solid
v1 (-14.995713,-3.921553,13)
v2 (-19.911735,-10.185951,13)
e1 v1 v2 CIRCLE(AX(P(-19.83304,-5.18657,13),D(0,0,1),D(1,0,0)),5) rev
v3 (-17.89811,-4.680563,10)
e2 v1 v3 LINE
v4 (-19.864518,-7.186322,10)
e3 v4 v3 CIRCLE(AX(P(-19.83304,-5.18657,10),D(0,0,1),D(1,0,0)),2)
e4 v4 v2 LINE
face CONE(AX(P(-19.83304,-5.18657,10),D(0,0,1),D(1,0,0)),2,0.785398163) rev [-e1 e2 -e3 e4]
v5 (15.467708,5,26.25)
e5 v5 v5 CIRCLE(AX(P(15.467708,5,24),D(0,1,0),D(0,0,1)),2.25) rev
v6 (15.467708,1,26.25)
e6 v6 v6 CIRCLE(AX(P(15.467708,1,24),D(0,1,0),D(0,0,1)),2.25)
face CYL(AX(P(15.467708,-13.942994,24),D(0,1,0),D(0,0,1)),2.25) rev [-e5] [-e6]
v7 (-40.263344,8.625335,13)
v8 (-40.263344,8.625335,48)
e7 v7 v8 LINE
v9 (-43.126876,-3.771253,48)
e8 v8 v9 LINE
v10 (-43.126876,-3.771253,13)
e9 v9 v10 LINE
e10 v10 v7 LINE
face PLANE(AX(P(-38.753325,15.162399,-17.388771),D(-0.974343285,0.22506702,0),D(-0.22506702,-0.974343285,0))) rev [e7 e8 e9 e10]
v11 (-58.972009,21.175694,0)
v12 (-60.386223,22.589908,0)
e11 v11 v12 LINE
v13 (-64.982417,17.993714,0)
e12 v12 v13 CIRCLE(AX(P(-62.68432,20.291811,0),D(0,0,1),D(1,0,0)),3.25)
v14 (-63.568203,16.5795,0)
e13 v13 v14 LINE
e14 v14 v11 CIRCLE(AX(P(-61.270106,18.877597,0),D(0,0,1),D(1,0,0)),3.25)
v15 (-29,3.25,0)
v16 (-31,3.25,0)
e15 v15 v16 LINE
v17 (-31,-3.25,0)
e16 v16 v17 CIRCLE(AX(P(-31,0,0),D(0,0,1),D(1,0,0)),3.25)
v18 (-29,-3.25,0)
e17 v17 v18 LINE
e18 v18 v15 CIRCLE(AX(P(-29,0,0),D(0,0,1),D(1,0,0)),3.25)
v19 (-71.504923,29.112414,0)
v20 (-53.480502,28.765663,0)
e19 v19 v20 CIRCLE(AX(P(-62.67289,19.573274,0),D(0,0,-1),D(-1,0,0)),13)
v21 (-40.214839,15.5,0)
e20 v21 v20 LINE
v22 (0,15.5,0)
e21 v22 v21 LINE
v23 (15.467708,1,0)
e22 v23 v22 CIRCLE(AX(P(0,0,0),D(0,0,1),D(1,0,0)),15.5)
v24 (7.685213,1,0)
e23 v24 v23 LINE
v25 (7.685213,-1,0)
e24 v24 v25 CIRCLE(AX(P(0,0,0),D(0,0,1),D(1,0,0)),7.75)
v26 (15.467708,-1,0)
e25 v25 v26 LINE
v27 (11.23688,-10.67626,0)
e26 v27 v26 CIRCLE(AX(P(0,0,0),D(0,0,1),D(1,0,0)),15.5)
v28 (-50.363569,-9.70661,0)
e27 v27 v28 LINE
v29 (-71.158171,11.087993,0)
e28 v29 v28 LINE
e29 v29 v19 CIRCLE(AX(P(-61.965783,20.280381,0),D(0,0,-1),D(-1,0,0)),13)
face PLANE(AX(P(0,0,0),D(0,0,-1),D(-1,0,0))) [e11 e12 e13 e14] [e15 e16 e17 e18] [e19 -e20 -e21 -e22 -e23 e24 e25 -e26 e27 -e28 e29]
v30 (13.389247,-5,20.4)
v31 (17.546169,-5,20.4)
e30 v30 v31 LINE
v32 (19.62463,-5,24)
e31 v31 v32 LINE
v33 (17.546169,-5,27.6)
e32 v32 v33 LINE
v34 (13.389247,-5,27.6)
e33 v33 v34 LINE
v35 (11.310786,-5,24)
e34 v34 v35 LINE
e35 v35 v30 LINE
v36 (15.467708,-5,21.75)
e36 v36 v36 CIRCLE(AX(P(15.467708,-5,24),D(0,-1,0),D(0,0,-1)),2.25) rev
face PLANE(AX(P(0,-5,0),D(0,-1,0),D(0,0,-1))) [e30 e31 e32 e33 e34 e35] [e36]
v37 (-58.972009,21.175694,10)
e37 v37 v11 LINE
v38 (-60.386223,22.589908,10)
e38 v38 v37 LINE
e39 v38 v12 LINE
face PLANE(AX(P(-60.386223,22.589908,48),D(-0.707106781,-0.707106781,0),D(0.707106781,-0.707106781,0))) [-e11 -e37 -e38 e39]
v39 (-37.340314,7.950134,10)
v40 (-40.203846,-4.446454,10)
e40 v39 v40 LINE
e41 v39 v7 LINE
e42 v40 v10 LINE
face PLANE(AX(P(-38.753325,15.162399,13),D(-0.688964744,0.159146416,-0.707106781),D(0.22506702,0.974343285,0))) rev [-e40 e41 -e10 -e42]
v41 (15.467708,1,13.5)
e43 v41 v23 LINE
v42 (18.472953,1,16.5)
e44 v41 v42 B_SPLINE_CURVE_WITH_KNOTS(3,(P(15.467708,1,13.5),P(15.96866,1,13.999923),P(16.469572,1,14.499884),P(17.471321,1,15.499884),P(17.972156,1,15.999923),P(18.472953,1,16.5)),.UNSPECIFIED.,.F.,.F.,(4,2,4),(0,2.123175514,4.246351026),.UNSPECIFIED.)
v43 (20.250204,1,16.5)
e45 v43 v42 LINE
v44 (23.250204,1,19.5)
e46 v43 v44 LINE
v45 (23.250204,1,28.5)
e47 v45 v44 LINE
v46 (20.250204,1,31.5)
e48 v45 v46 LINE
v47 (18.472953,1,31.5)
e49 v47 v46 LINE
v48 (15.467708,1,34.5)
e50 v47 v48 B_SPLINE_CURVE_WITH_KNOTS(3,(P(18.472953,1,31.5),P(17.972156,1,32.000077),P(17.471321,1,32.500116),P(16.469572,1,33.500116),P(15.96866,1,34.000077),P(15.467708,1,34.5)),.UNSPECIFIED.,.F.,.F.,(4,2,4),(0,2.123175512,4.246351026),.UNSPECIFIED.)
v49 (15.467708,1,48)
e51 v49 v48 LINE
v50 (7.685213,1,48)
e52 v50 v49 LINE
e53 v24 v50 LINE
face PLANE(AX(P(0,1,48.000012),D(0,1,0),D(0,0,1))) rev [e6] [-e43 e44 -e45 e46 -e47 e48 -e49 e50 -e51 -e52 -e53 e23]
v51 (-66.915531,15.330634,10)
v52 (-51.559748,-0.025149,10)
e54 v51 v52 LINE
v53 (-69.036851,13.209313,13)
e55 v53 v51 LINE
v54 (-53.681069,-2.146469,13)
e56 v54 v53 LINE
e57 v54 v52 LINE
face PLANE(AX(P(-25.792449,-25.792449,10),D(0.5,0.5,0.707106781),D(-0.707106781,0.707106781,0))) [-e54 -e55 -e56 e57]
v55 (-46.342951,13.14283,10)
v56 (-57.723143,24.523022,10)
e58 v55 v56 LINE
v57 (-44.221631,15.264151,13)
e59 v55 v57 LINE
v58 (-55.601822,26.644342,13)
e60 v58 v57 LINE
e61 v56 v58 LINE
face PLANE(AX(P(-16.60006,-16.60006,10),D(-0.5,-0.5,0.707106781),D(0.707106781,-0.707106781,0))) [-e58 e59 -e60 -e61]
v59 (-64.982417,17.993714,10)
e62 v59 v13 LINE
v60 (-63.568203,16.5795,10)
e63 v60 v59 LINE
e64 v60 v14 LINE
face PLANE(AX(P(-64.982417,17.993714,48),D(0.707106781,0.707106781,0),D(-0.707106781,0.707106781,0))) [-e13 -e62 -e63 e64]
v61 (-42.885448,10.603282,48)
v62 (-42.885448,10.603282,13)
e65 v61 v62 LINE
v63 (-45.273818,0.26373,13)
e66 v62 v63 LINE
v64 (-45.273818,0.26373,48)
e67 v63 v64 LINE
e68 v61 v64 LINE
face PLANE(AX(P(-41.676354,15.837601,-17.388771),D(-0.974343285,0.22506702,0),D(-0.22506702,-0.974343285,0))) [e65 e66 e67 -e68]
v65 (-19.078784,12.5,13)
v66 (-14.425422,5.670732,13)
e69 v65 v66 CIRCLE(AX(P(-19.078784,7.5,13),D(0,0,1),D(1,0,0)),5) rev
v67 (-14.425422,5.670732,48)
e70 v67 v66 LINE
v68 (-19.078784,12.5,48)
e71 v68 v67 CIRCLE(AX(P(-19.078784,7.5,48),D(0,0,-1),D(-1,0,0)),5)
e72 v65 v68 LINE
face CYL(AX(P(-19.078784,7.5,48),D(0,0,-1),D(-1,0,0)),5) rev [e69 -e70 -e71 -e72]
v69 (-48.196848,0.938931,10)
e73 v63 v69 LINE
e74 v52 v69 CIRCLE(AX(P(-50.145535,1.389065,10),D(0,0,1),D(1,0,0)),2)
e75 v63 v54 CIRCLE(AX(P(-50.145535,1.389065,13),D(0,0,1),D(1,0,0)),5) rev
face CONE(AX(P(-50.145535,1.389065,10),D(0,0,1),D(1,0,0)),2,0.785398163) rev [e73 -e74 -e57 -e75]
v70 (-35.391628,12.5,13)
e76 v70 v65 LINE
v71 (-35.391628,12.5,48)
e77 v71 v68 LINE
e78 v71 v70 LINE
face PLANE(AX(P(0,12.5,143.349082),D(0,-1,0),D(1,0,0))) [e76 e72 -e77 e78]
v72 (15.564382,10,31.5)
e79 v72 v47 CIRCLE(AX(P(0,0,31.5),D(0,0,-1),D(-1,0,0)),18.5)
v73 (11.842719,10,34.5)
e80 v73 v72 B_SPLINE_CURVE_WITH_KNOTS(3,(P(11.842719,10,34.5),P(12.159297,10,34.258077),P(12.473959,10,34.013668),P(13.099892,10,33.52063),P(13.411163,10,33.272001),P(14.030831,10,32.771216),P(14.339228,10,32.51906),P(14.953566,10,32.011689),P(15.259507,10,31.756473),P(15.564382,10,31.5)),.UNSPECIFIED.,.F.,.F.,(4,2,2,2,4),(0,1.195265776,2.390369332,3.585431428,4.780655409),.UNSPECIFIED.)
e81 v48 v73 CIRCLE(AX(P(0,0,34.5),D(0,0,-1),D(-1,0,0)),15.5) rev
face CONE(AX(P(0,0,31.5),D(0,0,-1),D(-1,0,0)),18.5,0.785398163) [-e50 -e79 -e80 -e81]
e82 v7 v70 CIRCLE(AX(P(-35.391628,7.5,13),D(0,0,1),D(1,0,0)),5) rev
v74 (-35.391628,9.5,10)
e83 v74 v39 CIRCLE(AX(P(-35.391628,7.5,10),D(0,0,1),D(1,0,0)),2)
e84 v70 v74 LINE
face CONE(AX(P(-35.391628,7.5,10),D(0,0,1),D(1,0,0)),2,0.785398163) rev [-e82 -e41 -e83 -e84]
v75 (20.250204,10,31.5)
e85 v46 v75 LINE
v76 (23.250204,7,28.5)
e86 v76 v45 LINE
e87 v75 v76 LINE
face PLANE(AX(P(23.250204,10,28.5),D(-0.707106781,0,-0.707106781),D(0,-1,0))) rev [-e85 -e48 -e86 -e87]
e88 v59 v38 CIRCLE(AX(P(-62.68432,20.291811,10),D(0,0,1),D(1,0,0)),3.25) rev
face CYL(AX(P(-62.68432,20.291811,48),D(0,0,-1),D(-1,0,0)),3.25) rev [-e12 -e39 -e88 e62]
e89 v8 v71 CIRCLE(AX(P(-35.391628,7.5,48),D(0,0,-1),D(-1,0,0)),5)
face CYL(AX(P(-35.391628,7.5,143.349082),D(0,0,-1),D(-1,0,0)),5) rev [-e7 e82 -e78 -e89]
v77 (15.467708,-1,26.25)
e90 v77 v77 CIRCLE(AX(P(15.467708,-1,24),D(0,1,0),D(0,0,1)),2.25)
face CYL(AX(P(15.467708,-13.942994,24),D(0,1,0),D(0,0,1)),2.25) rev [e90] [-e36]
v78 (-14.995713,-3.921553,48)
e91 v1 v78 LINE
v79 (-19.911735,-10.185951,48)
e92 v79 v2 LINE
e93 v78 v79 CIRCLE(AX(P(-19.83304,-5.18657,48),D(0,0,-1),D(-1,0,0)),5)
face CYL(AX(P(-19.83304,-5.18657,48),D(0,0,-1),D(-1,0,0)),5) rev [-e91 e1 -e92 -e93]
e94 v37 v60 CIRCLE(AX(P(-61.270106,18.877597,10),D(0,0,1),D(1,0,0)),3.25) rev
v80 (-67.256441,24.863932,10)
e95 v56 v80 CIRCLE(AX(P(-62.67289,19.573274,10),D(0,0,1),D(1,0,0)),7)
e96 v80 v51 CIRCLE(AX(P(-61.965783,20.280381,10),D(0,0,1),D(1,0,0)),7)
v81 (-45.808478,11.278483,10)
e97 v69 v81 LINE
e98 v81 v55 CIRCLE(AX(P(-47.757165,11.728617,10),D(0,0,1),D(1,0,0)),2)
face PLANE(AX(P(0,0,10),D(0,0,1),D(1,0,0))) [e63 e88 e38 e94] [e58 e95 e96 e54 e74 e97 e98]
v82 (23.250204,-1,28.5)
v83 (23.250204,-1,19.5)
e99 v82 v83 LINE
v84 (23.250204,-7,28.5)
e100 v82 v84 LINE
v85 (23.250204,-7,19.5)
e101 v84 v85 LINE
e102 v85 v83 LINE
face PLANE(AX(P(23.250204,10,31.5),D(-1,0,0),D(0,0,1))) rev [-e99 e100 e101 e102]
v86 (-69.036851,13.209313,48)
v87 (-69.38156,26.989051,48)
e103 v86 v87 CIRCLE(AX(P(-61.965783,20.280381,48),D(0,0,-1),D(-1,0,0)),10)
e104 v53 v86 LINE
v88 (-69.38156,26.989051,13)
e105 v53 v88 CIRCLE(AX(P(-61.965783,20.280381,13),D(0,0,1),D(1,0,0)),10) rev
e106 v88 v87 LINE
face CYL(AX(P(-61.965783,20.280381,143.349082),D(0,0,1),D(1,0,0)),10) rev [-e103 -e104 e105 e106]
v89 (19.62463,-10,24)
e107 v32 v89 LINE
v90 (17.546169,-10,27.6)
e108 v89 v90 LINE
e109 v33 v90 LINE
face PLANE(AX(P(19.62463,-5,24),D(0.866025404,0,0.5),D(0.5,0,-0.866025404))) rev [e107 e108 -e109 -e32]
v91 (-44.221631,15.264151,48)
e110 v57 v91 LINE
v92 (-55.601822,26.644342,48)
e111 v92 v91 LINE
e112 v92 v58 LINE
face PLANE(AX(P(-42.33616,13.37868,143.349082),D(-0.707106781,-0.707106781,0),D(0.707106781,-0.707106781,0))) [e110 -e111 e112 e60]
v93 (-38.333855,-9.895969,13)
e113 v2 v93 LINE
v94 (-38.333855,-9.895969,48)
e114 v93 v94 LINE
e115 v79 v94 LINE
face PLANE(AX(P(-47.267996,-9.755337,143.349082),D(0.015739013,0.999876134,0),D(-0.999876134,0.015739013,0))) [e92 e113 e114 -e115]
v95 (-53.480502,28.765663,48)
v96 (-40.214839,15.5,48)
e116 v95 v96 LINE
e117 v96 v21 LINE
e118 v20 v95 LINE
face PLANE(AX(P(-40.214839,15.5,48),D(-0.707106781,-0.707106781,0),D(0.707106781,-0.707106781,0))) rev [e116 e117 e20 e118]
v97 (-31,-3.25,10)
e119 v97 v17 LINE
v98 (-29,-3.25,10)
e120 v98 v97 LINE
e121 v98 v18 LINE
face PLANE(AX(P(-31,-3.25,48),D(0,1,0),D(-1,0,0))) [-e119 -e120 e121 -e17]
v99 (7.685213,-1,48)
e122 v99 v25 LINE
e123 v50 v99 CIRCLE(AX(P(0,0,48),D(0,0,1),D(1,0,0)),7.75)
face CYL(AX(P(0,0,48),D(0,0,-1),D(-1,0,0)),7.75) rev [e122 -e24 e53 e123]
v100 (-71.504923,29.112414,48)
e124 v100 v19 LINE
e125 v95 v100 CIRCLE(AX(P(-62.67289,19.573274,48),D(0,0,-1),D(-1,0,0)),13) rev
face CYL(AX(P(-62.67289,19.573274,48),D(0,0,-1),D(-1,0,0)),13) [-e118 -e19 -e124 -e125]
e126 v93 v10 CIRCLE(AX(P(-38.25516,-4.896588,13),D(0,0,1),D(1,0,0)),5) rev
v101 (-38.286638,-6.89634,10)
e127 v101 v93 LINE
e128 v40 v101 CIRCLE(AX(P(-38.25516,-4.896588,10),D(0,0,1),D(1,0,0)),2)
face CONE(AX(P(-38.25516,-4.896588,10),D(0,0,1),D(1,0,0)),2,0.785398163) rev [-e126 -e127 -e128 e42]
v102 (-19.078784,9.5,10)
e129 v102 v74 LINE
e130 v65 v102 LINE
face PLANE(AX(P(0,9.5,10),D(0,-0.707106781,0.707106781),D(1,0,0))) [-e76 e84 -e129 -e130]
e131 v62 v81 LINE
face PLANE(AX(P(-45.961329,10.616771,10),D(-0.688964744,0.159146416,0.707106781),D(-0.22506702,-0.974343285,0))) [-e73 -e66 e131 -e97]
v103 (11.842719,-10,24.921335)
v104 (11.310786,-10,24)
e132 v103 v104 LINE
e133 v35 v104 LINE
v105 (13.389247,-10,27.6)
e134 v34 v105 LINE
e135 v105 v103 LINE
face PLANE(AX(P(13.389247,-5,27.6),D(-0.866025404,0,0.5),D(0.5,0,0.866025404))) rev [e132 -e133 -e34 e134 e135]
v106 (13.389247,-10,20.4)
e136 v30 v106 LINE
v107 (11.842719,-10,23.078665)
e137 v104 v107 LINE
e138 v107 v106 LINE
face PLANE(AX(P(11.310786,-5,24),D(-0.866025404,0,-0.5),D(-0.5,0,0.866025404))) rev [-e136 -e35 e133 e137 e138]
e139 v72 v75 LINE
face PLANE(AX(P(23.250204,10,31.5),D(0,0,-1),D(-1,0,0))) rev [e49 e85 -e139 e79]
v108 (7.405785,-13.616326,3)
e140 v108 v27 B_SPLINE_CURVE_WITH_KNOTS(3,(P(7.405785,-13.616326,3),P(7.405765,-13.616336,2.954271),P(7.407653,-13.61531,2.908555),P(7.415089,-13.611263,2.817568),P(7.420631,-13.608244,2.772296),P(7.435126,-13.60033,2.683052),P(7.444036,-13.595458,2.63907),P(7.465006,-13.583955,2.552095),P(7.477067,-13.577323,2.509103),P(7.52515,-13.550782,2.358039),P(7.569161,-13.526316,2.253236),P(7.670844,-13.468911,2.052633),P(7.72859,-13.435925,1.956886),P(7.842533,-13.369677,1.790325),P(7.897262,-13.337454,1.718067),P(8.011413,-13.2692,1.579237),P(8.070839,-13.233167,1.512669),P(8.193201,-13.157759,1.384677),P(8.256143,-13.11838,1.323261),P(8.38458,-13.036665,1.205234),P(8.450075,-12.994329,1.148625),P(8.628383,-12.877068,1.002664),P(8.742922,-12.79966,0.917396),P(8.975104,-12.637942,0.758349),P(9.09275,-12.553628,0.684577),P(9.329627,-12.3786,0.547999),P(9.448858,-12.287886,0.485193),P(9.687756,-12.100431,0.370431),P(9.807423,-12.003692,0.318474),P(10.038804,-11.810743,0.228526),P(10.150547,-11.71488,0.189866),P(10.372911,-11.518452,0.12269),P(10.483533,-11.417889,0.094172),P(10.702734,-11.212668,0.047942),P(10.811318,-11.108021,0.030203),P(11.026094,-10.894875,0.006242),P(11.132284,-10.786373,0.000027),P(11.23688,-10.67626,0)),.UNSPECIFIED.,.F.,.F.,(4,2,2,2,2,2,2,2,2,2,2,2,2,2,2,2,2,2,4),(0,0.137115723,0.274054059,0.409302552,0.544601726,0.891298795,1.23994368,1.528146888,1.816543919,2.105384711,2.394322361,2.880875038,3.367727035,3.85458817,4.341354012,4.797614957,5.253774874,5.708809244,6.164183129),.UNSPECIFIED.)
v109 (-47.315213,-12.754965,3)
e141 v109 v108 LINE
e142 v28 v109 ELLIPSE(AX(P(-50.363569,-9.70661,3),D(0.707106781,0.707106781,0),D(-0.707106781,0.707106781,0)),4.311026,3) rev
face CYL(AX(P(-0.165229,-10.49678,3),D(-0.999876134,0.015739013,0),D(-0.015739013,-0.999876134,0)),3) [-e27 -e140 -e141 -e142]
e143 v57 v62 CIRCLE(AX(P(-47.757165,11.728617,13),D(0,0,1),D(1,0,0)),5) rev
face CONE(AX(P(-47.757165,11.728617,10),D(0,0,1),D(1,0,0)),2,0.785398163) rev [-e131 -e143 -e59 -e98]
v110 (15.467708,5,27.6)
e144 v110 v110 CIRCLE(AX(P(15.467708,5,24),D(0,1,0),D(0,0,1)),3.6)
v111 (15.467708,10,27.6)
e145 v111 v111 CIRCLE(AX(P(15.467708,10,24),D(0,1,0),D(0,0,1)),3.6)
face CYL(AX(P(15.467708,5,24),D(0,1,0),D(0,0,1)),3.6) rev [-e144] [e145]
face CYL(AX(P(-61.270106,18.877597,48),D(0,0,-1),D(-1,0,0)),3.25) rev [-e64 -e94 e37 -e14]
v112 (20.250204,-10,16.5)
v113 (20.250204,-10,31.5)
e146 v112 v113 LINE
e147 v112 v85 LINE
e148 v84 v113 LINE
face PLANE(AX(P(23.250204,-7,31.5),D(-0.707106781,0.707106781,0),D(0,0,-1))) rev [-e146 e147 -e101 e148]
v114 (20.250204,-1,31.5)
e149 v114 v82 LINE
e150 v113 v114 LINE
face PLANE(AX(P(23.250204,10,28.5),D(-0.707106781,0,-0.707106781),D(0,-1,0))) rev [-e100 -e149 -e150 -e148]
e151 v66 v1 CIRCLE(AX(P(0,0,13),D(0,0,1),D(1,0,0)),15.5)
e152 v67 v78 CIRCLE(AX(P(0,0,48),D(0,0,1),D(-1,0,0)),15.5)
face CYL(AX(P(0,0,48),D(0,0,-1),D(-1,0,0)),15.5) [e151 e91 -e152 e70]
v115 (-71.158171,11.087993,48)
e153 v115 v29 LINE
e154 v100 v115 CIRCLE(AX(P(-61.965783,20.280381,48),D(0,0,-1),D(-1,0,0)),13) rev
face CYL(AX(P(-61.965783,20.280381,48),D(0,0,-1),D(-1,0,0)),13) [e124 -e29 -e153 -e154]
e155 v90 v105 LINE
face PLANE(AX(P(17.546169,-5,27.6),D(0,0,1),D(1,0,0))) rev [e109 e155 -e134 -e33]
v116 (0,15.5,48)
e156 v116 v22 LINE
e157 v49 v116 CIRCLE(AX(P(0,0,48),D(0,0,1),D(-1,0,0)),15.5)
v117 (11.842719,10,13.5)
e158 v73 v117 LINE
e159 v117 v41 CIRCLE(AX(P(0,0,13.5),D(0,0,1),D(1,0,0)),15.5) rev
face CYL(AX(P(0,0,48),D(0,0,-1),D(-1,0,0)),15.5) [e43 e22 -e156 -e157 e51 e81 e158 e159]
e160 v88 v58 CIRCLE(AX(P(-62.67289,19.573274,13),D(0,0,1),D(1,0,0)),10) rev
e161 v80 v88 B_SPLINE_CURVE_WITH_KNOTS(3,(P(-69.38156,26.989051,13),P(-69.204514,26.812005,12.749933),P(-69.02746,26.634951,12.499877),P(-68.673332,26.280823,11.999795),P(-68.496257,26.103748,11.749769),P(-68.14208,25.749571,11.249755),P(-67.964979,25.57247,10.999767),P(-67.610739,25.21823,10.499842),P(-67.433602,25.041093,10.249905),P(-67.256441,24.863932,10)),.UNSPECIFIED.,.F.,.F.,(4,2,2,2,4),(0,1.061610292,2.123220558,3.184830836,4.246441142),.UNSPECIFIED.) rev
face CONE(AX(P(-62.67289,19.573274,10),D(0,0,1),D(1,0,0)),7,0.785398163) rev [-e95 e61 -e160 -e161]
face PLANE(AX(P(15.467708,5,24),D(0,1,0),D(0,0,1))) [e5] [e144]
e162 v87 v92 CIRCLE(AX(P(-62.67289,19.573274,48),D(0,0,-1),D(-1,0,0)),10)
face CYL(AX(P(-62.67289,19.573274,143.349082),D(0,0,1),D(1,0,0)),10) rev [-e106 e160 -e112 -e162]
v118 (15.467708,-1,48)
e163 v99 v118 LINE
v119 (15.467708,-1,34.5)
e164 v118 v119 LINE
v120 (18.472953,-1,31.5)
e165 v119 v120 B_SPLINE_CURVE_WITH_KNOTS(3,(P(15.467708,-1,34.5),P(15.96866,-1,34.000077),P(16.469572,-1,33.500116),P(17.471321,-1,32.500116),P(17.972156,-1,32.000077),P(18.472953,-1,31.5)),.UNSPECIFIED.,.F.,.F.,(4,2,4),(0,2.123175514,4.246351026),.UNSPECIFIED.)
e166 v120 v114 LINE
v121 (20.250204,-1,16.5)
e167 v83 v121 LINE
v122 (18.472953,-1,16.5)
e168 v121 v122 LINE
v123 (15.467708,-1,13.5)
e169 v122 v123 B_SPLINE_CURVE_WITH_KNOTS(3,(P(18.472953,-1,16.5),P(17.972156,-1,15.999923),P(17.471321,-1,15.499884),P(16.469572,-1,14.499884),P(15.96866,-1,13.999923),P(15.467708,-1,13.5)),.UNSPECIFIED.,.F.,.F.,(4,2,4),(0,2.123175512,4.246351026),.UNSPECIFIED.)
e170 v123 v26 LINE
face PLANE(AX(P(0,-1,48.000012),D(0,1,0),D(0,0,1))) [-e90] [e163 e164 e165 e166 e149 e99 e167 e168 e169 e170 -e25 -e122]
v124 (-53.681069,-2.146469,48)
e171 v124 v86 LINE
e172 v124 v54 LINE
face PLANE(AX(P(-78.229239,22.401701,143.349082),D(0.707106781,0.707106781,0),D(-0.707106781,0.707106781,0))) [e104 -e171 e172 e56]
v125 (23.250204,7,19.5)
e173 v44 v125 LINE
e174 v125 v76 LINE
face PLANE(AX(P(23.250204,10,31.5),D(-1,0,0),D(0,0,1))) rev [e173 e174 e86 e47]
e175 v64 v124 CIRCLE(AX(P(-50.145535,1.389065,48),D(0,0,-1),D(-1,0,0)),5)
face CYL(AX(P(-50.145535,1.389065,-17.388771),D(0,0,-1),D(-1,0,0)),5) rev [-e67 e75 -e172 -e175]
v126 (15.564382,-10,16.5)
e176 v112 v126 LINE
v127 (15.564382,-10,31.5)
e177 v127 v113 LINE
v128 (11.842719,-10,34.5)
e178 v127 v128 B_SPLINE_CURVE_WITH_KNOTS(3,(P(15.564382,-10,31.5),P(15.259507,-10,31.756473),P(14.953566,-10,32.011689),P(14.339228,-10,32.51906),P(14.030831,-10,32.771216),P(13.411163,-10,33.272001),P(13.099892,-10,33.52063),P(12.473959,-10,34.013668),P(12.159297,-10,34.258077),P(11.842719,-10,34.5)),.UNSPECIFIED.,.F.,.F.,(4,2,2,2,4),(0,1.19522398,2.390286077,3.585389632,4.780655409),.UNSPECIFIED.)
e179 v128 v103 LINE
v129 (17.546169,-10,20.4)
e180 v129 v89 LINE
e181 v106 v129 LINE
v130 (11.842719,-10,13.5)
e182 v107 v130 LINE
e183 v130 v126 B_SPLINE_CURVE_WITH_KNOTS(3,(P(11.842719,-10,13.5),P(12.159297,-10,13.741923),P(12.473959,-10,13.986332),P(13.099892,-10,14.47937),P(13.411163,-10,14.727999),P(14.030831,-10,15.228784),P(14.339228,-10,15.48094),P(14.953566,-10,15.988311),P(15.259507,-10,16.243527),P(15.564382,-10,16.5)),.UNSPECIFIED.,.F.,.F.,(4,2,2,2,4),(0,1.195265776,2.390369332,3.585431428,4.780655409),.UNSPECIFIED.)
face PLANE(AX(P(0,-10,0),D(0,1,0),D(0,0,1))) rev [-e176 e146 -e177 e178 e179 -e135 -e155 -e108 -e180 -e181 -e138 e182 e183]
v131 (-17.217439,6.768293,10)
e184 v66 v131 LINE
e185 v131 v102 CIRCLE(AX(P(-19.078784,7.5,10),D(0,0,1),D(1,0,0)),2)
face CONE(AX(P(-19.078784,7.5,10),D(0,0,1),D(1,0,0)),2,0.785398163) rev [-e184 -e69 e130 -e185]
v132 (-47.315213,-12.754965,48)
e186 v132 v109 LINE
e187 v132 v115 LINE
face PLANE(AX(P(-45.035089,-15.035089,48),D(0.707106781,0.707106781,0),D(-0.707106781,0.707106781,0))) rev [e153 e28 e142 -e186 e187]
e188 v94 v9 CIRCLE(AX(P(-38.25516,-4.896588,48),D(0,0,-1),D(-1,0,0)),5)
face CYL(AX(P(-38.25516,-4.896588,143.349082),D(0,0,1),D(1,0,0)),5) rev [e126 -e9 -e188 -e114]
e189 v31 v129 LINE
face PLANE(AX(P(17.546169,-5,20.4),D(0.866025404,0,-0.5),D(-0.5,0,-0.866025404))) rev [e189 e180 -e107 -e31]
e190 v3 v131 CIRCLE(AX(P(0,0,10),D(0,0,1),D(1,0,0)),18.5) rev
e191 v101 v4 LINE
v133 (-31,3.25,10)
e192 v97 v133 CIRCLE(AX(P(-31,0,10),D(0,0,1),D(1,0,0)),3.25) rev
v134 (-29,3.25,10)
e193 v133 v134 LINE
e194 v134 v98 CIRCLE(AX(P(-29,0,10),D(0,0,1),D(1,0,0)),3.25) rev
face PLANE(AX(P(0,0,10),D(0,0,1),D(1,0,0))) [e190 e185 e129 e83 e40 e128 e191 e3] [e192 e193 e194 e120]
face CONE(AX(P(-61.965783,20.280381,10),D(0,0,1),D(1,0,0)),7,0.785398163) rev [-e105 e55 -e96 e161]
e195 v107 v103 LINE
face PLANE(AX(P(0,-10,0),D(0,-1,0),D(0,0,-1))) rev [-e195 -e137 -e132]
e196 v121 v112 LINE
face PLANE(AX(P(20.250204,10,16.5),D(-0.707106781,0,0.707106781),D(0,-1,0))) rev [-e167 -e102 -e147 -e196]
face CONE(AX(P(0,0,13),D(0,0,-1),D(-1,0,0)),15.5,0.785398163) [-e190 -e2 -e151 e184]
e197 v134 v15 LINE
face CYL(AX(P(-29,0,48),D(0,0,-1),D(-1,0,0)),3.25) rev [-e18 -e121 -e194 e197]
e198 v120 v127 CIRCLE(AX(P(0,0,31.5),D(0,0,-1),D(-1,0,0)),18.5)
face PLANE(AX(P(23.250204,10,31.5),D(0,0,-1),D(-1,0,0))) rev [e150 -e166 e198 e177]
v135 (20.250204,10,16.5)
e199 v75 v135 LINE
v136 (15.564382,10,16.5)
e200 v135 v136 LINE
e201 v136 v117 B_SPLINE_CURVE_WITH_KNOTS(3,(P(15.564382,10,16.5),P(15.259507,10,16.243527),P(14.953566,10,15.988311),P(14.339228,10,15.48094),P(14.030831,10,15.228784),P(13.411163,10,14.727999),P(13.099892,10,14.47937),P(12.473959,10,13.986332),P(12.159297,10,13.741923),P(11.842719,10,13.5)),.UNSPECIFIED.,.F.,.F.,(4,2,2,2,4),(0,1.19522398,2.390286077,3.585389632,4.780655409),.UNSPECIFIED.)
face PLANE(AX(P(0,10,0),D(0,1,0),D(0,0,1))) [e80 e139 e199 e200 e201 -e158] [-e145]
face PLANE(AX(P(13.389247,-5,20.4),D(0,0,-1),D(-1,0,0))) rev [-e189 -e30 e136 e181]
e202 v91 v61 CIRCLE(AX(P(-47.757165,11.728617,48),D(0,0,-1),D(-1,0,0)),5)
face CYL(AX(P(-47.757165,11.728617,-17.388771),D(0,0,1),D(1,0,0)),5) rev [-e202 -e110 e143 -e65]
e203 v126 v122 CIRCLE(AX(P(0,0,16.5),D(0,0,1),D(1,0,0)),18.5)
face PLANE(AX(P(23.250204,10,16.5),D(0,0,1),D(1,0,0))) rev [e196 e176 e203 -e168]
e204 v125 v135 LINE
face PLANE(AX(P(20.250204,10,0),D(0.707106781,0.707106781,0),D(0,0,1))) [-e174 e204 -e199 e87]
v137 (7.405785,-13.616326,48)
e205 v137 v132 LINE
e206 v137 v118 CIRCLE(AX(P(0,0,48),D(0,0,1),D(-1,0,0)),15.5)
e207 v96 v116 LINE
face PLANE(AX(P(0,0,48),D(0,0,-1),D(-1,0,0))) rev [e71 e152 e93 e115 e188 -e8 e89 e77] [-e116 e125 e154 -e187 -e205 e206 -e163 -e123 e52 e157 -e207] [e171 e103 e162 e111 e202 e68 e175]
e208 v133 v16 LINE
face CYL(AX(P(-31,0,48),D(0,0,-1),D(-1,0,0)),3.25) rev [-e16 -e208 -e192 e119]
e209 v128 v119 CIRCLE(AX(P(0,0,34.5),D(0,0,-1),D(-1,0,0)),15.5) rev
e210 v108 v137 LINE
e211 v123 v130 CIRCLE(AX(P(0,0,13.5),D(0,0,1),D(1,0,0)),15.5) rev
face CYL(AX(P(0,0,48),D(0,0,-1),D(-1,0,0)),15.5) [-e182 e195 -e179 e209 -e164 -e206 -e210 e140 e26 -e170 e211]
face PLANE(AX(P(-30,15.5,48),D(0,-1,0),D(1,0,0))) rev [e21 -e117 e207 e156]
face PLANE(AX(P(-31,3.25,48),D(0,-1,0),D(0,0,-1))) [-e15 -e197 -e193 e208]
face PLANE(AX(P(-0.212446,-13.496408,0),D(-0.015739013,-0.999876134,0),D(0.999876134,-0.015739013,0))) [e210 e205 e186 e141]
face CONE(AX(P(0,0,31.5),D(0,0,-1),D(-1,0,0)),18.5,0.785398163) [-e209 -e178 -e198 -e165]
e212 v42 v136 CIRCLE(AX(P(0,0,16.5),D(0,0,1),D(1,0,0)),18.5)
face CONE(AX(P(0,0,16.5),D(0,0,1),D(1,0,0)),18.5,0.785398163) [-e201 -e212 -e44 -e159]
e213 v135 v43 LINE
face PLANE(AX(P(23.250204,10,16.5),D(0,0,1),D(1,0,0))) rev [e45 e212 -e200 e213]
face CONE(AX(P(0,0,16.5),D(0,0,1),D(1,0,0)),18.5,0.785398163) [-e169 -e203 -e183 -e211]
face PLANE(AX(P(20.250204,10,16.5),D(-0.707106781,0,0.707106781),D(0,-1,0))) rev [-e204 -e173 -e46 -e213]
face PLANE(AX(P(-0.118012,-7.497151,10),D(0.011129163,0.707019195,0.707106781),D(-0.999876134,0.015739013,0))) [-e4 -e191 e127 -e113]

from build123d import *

# Parameters (mm, degrees)
SKETCH1_R                    = 7.75
BOSS_EXTRUDE1_DEPTH          = 48
CUT_EXTRUDE1_START           = -38
CUT_EXTRUDE1_DEPTH           = 38
CUT_EXTRUDE2_DEPTH           = 2
CUT_EXTRUDE2_DEPTH_BACK      = 2
SKETCH17_W                   = 125.861359887
SKETCH17_H                   = 127.556512283
EXTRUDE_THIN1_DEPTH          = 38
FILLET1_R                    = 10
FILLET2_R                    = 13
EXTRUDE_THIN2_DEPTH          = 38
FILLET3_R                    = 5
CHAMFER1_SIZE                = 3
FILLET4_R                    = 3
SKETCH20_W                   = 15.564990448
SKETCH20_H                   = 15
BOSS_EXTRUDE3_DEPTH          = 10
CUT_EXTRUDE_THIN2_DEPTH      = 95.788643218
CUT_EXTRUDE_THIN2_DEPTH_BACK = 63
SKETCH15_W                   = 30.528675624
SKETCH15_H                   = 2
CUT_EXTRUDE3_DEPTH           = 96.136919394
CUT_EXTRUDE3_DEPTH_BACK      = 96.136919394
SKETCH21_R                   = 2.25
SKETCH22_R                   = 3.6
CUT_EXTRUDE4_DEPTH           = 5
CUT_EXTRUDE5_DEPTH           = 5
CHAMFER2_SIZE                = 3
CHAMFER3_SIZE                = 3


# Read off the part's stored shape, not the designer's step: Cut-Extrude1
with BuildPart() as part:
    # Sketch1 → Boss-Extrude1 (new body)
    with BuildSketch(Plane.XY):
        with BuildLine():
            Line((0, 15.5), (-30, 15.5))
            Line((-30, 15.5), (-40.214839435, 15.5))
            Line((-40.214839435, 15.5), (-62.672890113, 37.958050678))
            Line((-62.672890113, 37.958050678), (-80.350559642, 20.280381148))
            Line((-80.350559642, 20.280381148), (-45.035089247, -15.035089247))
            Line((-45.035089247, -15.035089247), (-29.535089247, -15.035089247))
            Line((-29.535089247, -15.035089247), (0, -15.5))
            ThreePointArc((0, -15.5), (10.960155108, -10.960155108), (15.5, 0))
            ThreePointArc((15.5, 0), (10.960155108, 10.960155108), (0, 15.5))
        make_face()
        Circle(SKETCH1_R, mode=Mode.SUBTRACT)
        with BuildLine():
            Line((-31, 3.25), (-29, 3.25))
            ThreePointArc((-29, 3.25), (-25.75, 0), (-29, -3.25))
            Line((-29, -3.25), (-31, -3.25))
            ThreePointArc((-31, -3.25), (-34.25, 0), (-31, 3.25))
        make_face(mode=Mode.SUBTRACT)
        with BuildLine():
            Line((-60.386222858, 22.589907971), (-58.972009295, 21.175694409))
            ThreePointArc((-58.972009295, 21.175694409), (-58.972009295, 16.579500331), (-63.568203373, 16.579500331))
            Line((-63.568203373, 16.579500331), (-64.982416935, 17.993713893))
            ThreePointArc((-64.982416935, 17.993713893), (-64.982416935, 22.589907971), (-60.386222858, 22.589907971))
        make_face(mode=Mode.SUBTRACT)
    extrude(amount=BOSS_EXTRUDE1_DEPTH)

    # Cut-Extrude1 outline → Cut-Extrude1 (cut)
    with BuildSketch(Plane.XY.offset(48).offset(CUT_EXTRUDE1_START)):
        with BuildLine():
            Line((-29.535089247, -15.035089247), (-0.487848981, -15.492320787))
            ThreePointArc((-0.487848981, -15.492320787), (-15.498080073, 0.243954708), (0, 15.5))
            Line((0, 15.5), (-40.214839435, 15.5))
            Line((-40.214839435, 15.5), (-62.672890113, 37.958050678))
            Line((-62.672890113, 37.958050678), (-80.350559642, 20.280381148))
            Line((-80.350559642, 20.280381148), (-45.035089247, -15.035089247))
            Line((-45.035089247, -15.035089247), (-29.535089247, -15.035089247))
        make_face()
        with BuildLine():
            Line((-29, -3.25), (-31, -3.25))
            ThreePointArc((-31, -3.25), (-34.25, 0), (-31, 3.25))
            Line((-31, 3.25), (-29, 3.25))
            ThreePointArc((-29, 3.25), (-25.75, 0), (-29, -3.25))
        make_face(mode=Mode.SUBTRACT)
        with BuildLine():
            Line((-63.568203373, 16.579500331), (-64.982416935, 17.993713893))
            ThreePointArc((-64.982416935, 17.993713893), (-64.982416935, 22.589907971), (-60.386222858, 22.589907971))
            Line((-60.386222858, 22.589907971), (-58.972009295, 21.175694409))
            ThreePointArc((-58.972009295, 21.175694409), (-58.972009295, 16.579500331), (-63.568203373, 16.579500331))
        make_face(mode=Mode.SUBTRACT)
    extrude(amount=CUT_EXTRUDE1_DEPTH, mode=Mode.SUBTRACT)

    # Sketch17 → Cut-Extrude2 (cut, two sides: drawn at the far end of the back side and taken through both)
    with BuildSketch(Plane(origin=(-0.243924491, -15.496160394, 0), x_dir=(-0.999876134056697, 0.015739013432683965, 0), z_dir=(-0.015739013432683965, -0.999876134056697, 0)).offset(-CUT_EXTRUDE2_DEPTH_BACK)):
        with Locations((29.523320042, -28.408716393)):
            Rectangle(SKETCH17_W, SKETCH17_H)
    extrude(amount=CUT_EXTRUDE2_DEPTH + CUT_EXTRUDE2_DEPTH_BACK, mode=Mode.SUBTRACT)

    # Sketch18 → Extrude-Thin1 (add)
    with BuildSketch(Plane.XY.offset(10)):
        Polygon((0, 15.5), (-40.214839435, 15.5), (-62.672890113, 37.958050678), (-80.350559642, 20.280381148), (-47.315213288, -12.754965206), (-7.830678136, -13.376489821), (-7.783461096, -10.376861419), (-46.053077004, -9.774460803), (-76.107918955, 20.280381148), (-62.672890113, 33.715409991), (-41.457480122, 12.5), (0, 12.5), align=None)
    extrude(amount=EXTRUDE_THIN1_DEPTH)

    # Fillet1
    # the kernel refuses this fillet: 10 mm, written as the material it adds along each edge
    with BuildSketch(Plane(origin=(-76.107918955, 20.280381148, 10), x_dir=(0.7071067811865474, 0.7071067811865477, 0), z_dir=(0, 0, 1)), Plane(origin=(-62.672890113, 33.715409991, 10), x_dir=(0.7071067811865476, -0.7071067811865476, 0), z_dir=(0, 0, 1))) as fillet1_piece_1:
        with BuildLine():
            CenterArc((FILLET1_R, -FILLET1_R), FILLET1_R, 90, 90)
            Line((0, -FILLET1_R), (0, 0))
            Line((0, 0), (FILLET1_R, 0))
        make_face()
    extrude(amount=38)

    # Fillet2
    # the kernel refuses this fillet: 13 mm, written as the material it takes off along each edge
    with BuildSketch(Plane(origin=(-80.350559642, 20.280381148, 80.5), x_dir=(0.7071067811865474, 0.7071067811865477, 0), z_dir=(0, 0, -1))) as fillet2_piece_1:
        with BuildLine():
            CenterArc((FILLET2_R, FILLET2_R), FILLET2_R, 180, 90)
            Line((0, FILLET2_R), (0, 0))
            Line((0, 0), (FILLET2_R, 0))
        make_face()
    extrude(amount=113, mode=Mode.SUBTRACT)
    with BuildSketch(Plane(origin=(-62.672890113, 37.958050678, -32.5), x_dir=(0.707106781186548, -0.7071067811865471, 0), z_dir=(0, 0, 1))) as fillet2_piece_2:
        with BuildLine():
            CenterArc((FILLET2_R, -FILLET2_R), FILLET2_R, 90, 90)
            Line((0, -FILLET2_R), (0, 0))
            Line((0, 0), (FILLET2_R, 0))
        make_face()
    extrude(amount=113, mode=Mode.SUBTRACT)

    # Sketch19 → Extrude-Thin2 (add)
    with BuildSketch(Plane.XY.offset(48)):
        Polygon((-41.676354362, 15.83760053), (-47.514591931, -9.436860273), (-44.591562077, -10.112061333), (-38.753324508, 15.16239947), align=None)
    extrude(amount=-EXTRUDE_THIN2_DEPTH)

    # Fillet3
    fillet3_edges = [part.edges().sort_by_distance(p)[0] for p in [
        (-9.165151385, 12.5, 29),
        (-11.56733894, -10.317299537, 29),
        (-47.303691572, -8.523846235, 29),
        (-44.51915596, -9.798606198, 29),
        (-39.368321628, 12.5, 29),
        (-42.261577308, 13.304097186, 29),
    ]]
    fillet(fillet3_edges, radius=FILLET3_R)

    # Chamfer1
    # the kernel refuses this chamfer: 3 mm, written as the material it adds along each edge
    with BuildSketch(Plane(origin=(-53.68106853, -2.146469277, 10), x_dir=(-0.019442520806014586, -0.01944252080601459, 0.9996219169112968), z_dir=(-0.7071067811865476, 0.7071067811865475, 0))) as chamfer1_piece_1:
        Polygon((CHAMFER1_SIZE * 0.999621916911, CHAMFER1_SIZE * 0.0274958766106), (-CHAMFER1_SIZE * 0.0274958766106, CHAMFER1_SIZE * 0.999621916911), (0, 0), align=None)
    extrude(amount=21.716356033)
    with BuildSketch(Plane(origin=(-62.672890113, 19.573274367, 10), x_dir=(0.7071067811865476, 0.7071067811865476, 0), z_dir=(0.7071067811865476, -0.7071067811865476, 0))) as chamfer1_piece_2:
        Polygon((10, CHAMFER1_SIZE), (10 - CHAMFER1_SIZE, 0), (10, 0), align=None)
    revolve(axis=Axis((-62.672890113, 19.573274367, 10), (0, 0, 1)), revolution_arc=131.354634341)
    with BuildSketch(Plane(origin=(-61.965783332, 20.280381148, 10), x_dir=(-0.06358071748062528, 0.9979766993094824, 0), z_dir=(0.9979766993094824, 0.06358071748062528, 0))) as chamfer1_piece_3:
        Polygon((10, CHAMFER1_SIZE), (10 - CHAMFER1_SIZE, 0), (10, 0), align=None)
    revolve(axis=Axis((-61.965783332, 20.280381148, 10), (0, 0, 1)), revolution_arc=131.354634341)
    with BuildSketch(Plane(origin=(-42.885448285, 10.603281677, 10), x_dir=(0.026790422734602474, -0.006188415005949584, 0.9996219169112968), z_dir=(-0.225067019815147, -0.9743432847777668, 0))) as chamfer1_piece_4:
        Polygon((CHAMFER1_SIZE * 0.999621916911, CHAMFER1_SIZE * 0.0274958766106), (-CHAMFER1_SIZE * 0.0274958766106, CHAMFER1_SIZE * 0.999621916911), (0, 0), align=None)
    extrude(amount=10.611816501)
    with BuildSketch(Plane(origin=(-55.601822301, 26.644342179, 10), x_dir=(0.01944252080601379, 0.019442520806013806, 0.9996219169112968), z_dir=(0.7071067811865479, -0.7071067811865472, 0))) as chamfer1_piece_5:
        Polygon((CHAMFER1_SIZE * 0.999621916911, CHAMFER1_SIZE * 0.0274958766106), (-CHAMFER1_SIZE * 0.0274958766106, CHAMFER1_SIZE * 0.999621916911), (0, 0), align=None)
    extrude(amount=16.094021158)
    with BuildSketch(Plane(origin=(-47.757164709, 11.728616776, 10), x_dir=(0.7071067811865476, 0.7071067811865476, 0), z_dir=(-0.7071067811865476, 0.7071067811865476, 0))) as chamfer1_piece_6:
        Polygon((5, -CHAMFER1_SIZE), (5 - CHAMFER1_SIZE, 0), (5, 0), align=None)
    revolve(axis=Axis((-47.757164709, 11.728616776, 10), (0, 0, -1)), revolution_arc=58.006819199)
    with BuildSketch(Plane(origin=(-50.145534624, 1.389064629, 10), x_dir=(0.9743432847777667, -0.22506701981514685, 0), z_dir=(0.22506701981514685, 0.9743432847777667, 0))) as chamfer1_piece_7:
        Polygon((5, -CHAMFER1_SIZE), (5 - CHAMFER1_SIZE, 0), (5, 0), align=None)
    revolve(axis=Axis((-50.145534624, 1.389064629, 10), (0, 0, -1)), revolution_arc=121.993180801)
    with BuildSketch(Plane(origin=(-19.911735458, -10.185950698, 10), x_dir=(-0.000432757971317445, -0.02749247080789303, 0.9996219169112968), z_dir=(-0.999876134056697, 0.015739013432684173, 0))) as chamfer1_piece_8:
        Polygon((CHAMFER1_SIZE * 0.999621916911, CHAMFER1_SIZE * 0.0274958766106), (-CHAMFER1_SIZE * 0.0274958766106, CHAMFER1_SIZE * 0.999621916911), (0, 0), align=None)
    extrude(amount=18.424401561)
    with BuildSketch(Plane(origin=(-43.12687622, -3.771253025, 10), x_dir=(-0.026790422734602474, 0.006188415005949584, 0.9996219169112968), z_dir=(0.225067019815147, 0.9743432847777668, 0))) as chamfer1_piece_9:
        Polygon((CHAMFER1_SIZE * 0.999621916911, CHAMFER1_SIZE * 0.0274958766106), (-CHAMFER1_SIZE * 0.0274958766106, CHAMFER1_SIZE * 0.999621916911), (0, 0), align=None)
    extrude(amount=12.723019)
    with BuildSketch(Plane(origin=(-35.391627827, 12.5, 10), x_dir=(0, 0.027495876610586206, 0.9996219169112968), z_dir=(1, 0, 0))) as chamfer1_piece_10:
        Polygon((CHAMFER1_SIZE * 0.999621916911, CHAMFER1_SIZE * 0.0274958766106), (-CHAMFER1_SIZE * 0.0274958766106, CHAMFER1_SIZE * 0.999621916911), (0, 0), align=None)
    extrude(amount=16.312843803)
    with BuildSketch(Plane(origin=(5e-09, 0, 10), x_dir=(-0.9674653851631903, -0.25300341600666165, 0), z_dir=(0.25300341600666165, -0.9674653851631903, 0))) as chamfer1_piece_11:
        Polygon((15.5, -CHAMFER1_SIZE), (15.5 + CHAMFER1_SIZE, 0), (15.5, 0), align=None)
    revolve(axis=Axis((5e-09, 0, 10), (0, 0, -1)), revolution_arc=36.115438071)
    with BuildSketch(Plane(origin=(-35.391627827, 7.5, 10), x_dir=(-0.9743432847777669, 0.22506701981514626, 0), z_dir=(-0.22506701981514626, -0.9743432847777669, 0))) as chamfer1_piece_12:
        Polygon((5, -CHAMFER1_SIZE), (5 - CHAMFER1_SIZE, 0), (5, 0), align=None)
    revolve(axis=Axis((-35.391627827, 7.5, 10), (0, 0, -1)), revolution_arc=76.993180801)
    with BuildSketch(Plane(origin=(-19.078784023, 7.5, 10), x_dir=(0.9306723916262207, -0.3658536585367573, 0), z_dir=(-0.3658536585367573, -0.9306723916262207, 0))) as chamfer1_piece_13:
        Polygon((5, CHAMFER1_SIZE), (5 - CHAMFER1_SIZE, 0), (5, 0), align=None)
    revolve(axis=Axis((-19.078784023, 7.5, 10), (0, 0, 1)), revolution_arc=111.460127749)
    with BuildSketch(Plane(origin=(-19.833040391, -5.186570028, 10), x_dir=(0.9674653851631903, 0.25300341600666165, 0), z_dir=(-0.25300341600666165, 0.9674653851631903, 0))) as chamfer1_piece_14:
        Polygon((5, -CHAMFER1_SIZE), (5 - CHAMFER1_SIZE, 0), (5, 0), align=None)
    revolve(axis=Axis((-19.833040391, -5.186570028, 10), (0, 0, -1)), revolution_arc=105.5571266)
    with BuildSketch(Plane(origin=(-38.255159796, -4.896588124, 10), x_dir=(-0.0157390134326846, -0.9998761340566968, 0), z_dir=(0.9998761340566968, -0.0157390134326846, 0))) as chamfer1_piece_15:
        Polygon((5, -CHAMFER1_SIZE), (5 - CHAMFER1_SIZE, 0), (5, 0), align=None)
    revolve(axis=Axis((-38.255159796, -4.896588124, 10), (0, 0, -1)), revolution_arc=102.105002921)

    # Fillet4
    fillet4_edges = [part.edges().sort_by_distance(p)[0] for p in [
        (-19.95471404, -13.185645818, 0),
    ]]
    fillet(fillet4_edges, radius=FILLET4_R)

    # Sketch20 → Boss-Extrude3 (add, symmetric)
    with BuildSketch(Plane(origin=(0, 0, 0), x_dir=(1, 0, 0), z_dir=(0, 1, 0))):
        with Locations((15.467708298, -24)):
            Rectangle(SKETCH20_W, SKETCH20_H)
    extrude(amount=BOSS_EXTRUDE3_DEPTH, both=True)

    # Sketch15 → Cut-Extrude-Thin2 (cut, two sides: drawn at the far end of the back side and taken through both)
    with BuildSketch(Plane.XY.offset(48).offset(-CUT_EXTRUDE_THIN2_DEPTH_BACK)):
        with Locations((15.264337812, 0)):
            Rectangle(SKETCH15_W, SKETCH15_H)
    extrude(amount=CUT_EXTRUDE_THIN2_DEPTH + CUT_EXTRUDE_THIN2_DEPTH_BACK, mode=Mode.SUBTRACT)

    # Sketch21 → Cut-Extrude3 (cut, two sides: drawn at the far end of the back side and taken through both)
    with BuildSketch(Plane(origin=(0, -1, 0), x_dir=(1, 0, 0), z_dir=(0, 1, 0)).offset(-CUT_EXTRUDE3_DEPTH_BACK)):
        with Locations(Location((15.467708298, -24, 0), (0, 0, 270))):
            Circle(SKETCH21_R)
    extrude(amount=CUT_EXTRUDE3_DEPTH + CUT_EXTRUDE3_DEPTH_BACK, mode=Mode.SUBTRACT)

    # Sketch22 → Cut-Extrude4 (cut)
    with BuildSketch(Plane(origin=(0, 10, 0), x_dir=(1, 0, 0), z_dir=(0, 1, 0))):
        with Locations(Location((15.467708298, -24, 0), (0, 0, 270))):
            Circle(SKETCH22_R)
    extrude(amount=-CUT_EXTRUDE4_DEPTH, mode=Mode.SUBTRACT)

    # Sketch23 → Cut-Extrude5 (cut)
    with BuildSketch(Plane(origin=(0, -10, 0), x_dir=(-1, 0, 0), z_dir=(0, -1, 0))):
        Polygon((-19.624630236, -24), (-17.546169267, -27.6), (-13.389247329, -27.6), (-11.31078636, -24), (-13.389247329, -20.4), (-17.546169267, -20.4), align=None)
    extrude(amount=-CUT_EXTRUDE5_DEPTH, mode=Mode.SUBTRACT)

    # Chamfer2
    chamfer2_edges = [part.edges().sort_by_distance(p)[0] for p in [
        (23.250203522, 10, 24),
        (14.377581982, 5.790952974, 31.5),
        (23.250203522, -10, 24),
        (14.377581982, -5.790952974, 16.5),
        (14.377581982, 5.790952974, 16.5),
        (14.377581982, -5.790952974, 31.5),
    ]]
    chamfer(chamfer2_edges, length=CHAMFER2_SIZE)

    # Chamfer3
    chamfer3_edges = [part.edges().sort_by_distance(p)[0] for p in [
        (23.250203522, -4, 16.5),
        (23.250203522, 4, 16.5),
        (23.250203522, -4, 31.5),
        (23.250203522, 4, 31.5),
    ]]
    chamfer(chamfer3_edges, length=CHAMFER3_SIZE)


solid = part.part
